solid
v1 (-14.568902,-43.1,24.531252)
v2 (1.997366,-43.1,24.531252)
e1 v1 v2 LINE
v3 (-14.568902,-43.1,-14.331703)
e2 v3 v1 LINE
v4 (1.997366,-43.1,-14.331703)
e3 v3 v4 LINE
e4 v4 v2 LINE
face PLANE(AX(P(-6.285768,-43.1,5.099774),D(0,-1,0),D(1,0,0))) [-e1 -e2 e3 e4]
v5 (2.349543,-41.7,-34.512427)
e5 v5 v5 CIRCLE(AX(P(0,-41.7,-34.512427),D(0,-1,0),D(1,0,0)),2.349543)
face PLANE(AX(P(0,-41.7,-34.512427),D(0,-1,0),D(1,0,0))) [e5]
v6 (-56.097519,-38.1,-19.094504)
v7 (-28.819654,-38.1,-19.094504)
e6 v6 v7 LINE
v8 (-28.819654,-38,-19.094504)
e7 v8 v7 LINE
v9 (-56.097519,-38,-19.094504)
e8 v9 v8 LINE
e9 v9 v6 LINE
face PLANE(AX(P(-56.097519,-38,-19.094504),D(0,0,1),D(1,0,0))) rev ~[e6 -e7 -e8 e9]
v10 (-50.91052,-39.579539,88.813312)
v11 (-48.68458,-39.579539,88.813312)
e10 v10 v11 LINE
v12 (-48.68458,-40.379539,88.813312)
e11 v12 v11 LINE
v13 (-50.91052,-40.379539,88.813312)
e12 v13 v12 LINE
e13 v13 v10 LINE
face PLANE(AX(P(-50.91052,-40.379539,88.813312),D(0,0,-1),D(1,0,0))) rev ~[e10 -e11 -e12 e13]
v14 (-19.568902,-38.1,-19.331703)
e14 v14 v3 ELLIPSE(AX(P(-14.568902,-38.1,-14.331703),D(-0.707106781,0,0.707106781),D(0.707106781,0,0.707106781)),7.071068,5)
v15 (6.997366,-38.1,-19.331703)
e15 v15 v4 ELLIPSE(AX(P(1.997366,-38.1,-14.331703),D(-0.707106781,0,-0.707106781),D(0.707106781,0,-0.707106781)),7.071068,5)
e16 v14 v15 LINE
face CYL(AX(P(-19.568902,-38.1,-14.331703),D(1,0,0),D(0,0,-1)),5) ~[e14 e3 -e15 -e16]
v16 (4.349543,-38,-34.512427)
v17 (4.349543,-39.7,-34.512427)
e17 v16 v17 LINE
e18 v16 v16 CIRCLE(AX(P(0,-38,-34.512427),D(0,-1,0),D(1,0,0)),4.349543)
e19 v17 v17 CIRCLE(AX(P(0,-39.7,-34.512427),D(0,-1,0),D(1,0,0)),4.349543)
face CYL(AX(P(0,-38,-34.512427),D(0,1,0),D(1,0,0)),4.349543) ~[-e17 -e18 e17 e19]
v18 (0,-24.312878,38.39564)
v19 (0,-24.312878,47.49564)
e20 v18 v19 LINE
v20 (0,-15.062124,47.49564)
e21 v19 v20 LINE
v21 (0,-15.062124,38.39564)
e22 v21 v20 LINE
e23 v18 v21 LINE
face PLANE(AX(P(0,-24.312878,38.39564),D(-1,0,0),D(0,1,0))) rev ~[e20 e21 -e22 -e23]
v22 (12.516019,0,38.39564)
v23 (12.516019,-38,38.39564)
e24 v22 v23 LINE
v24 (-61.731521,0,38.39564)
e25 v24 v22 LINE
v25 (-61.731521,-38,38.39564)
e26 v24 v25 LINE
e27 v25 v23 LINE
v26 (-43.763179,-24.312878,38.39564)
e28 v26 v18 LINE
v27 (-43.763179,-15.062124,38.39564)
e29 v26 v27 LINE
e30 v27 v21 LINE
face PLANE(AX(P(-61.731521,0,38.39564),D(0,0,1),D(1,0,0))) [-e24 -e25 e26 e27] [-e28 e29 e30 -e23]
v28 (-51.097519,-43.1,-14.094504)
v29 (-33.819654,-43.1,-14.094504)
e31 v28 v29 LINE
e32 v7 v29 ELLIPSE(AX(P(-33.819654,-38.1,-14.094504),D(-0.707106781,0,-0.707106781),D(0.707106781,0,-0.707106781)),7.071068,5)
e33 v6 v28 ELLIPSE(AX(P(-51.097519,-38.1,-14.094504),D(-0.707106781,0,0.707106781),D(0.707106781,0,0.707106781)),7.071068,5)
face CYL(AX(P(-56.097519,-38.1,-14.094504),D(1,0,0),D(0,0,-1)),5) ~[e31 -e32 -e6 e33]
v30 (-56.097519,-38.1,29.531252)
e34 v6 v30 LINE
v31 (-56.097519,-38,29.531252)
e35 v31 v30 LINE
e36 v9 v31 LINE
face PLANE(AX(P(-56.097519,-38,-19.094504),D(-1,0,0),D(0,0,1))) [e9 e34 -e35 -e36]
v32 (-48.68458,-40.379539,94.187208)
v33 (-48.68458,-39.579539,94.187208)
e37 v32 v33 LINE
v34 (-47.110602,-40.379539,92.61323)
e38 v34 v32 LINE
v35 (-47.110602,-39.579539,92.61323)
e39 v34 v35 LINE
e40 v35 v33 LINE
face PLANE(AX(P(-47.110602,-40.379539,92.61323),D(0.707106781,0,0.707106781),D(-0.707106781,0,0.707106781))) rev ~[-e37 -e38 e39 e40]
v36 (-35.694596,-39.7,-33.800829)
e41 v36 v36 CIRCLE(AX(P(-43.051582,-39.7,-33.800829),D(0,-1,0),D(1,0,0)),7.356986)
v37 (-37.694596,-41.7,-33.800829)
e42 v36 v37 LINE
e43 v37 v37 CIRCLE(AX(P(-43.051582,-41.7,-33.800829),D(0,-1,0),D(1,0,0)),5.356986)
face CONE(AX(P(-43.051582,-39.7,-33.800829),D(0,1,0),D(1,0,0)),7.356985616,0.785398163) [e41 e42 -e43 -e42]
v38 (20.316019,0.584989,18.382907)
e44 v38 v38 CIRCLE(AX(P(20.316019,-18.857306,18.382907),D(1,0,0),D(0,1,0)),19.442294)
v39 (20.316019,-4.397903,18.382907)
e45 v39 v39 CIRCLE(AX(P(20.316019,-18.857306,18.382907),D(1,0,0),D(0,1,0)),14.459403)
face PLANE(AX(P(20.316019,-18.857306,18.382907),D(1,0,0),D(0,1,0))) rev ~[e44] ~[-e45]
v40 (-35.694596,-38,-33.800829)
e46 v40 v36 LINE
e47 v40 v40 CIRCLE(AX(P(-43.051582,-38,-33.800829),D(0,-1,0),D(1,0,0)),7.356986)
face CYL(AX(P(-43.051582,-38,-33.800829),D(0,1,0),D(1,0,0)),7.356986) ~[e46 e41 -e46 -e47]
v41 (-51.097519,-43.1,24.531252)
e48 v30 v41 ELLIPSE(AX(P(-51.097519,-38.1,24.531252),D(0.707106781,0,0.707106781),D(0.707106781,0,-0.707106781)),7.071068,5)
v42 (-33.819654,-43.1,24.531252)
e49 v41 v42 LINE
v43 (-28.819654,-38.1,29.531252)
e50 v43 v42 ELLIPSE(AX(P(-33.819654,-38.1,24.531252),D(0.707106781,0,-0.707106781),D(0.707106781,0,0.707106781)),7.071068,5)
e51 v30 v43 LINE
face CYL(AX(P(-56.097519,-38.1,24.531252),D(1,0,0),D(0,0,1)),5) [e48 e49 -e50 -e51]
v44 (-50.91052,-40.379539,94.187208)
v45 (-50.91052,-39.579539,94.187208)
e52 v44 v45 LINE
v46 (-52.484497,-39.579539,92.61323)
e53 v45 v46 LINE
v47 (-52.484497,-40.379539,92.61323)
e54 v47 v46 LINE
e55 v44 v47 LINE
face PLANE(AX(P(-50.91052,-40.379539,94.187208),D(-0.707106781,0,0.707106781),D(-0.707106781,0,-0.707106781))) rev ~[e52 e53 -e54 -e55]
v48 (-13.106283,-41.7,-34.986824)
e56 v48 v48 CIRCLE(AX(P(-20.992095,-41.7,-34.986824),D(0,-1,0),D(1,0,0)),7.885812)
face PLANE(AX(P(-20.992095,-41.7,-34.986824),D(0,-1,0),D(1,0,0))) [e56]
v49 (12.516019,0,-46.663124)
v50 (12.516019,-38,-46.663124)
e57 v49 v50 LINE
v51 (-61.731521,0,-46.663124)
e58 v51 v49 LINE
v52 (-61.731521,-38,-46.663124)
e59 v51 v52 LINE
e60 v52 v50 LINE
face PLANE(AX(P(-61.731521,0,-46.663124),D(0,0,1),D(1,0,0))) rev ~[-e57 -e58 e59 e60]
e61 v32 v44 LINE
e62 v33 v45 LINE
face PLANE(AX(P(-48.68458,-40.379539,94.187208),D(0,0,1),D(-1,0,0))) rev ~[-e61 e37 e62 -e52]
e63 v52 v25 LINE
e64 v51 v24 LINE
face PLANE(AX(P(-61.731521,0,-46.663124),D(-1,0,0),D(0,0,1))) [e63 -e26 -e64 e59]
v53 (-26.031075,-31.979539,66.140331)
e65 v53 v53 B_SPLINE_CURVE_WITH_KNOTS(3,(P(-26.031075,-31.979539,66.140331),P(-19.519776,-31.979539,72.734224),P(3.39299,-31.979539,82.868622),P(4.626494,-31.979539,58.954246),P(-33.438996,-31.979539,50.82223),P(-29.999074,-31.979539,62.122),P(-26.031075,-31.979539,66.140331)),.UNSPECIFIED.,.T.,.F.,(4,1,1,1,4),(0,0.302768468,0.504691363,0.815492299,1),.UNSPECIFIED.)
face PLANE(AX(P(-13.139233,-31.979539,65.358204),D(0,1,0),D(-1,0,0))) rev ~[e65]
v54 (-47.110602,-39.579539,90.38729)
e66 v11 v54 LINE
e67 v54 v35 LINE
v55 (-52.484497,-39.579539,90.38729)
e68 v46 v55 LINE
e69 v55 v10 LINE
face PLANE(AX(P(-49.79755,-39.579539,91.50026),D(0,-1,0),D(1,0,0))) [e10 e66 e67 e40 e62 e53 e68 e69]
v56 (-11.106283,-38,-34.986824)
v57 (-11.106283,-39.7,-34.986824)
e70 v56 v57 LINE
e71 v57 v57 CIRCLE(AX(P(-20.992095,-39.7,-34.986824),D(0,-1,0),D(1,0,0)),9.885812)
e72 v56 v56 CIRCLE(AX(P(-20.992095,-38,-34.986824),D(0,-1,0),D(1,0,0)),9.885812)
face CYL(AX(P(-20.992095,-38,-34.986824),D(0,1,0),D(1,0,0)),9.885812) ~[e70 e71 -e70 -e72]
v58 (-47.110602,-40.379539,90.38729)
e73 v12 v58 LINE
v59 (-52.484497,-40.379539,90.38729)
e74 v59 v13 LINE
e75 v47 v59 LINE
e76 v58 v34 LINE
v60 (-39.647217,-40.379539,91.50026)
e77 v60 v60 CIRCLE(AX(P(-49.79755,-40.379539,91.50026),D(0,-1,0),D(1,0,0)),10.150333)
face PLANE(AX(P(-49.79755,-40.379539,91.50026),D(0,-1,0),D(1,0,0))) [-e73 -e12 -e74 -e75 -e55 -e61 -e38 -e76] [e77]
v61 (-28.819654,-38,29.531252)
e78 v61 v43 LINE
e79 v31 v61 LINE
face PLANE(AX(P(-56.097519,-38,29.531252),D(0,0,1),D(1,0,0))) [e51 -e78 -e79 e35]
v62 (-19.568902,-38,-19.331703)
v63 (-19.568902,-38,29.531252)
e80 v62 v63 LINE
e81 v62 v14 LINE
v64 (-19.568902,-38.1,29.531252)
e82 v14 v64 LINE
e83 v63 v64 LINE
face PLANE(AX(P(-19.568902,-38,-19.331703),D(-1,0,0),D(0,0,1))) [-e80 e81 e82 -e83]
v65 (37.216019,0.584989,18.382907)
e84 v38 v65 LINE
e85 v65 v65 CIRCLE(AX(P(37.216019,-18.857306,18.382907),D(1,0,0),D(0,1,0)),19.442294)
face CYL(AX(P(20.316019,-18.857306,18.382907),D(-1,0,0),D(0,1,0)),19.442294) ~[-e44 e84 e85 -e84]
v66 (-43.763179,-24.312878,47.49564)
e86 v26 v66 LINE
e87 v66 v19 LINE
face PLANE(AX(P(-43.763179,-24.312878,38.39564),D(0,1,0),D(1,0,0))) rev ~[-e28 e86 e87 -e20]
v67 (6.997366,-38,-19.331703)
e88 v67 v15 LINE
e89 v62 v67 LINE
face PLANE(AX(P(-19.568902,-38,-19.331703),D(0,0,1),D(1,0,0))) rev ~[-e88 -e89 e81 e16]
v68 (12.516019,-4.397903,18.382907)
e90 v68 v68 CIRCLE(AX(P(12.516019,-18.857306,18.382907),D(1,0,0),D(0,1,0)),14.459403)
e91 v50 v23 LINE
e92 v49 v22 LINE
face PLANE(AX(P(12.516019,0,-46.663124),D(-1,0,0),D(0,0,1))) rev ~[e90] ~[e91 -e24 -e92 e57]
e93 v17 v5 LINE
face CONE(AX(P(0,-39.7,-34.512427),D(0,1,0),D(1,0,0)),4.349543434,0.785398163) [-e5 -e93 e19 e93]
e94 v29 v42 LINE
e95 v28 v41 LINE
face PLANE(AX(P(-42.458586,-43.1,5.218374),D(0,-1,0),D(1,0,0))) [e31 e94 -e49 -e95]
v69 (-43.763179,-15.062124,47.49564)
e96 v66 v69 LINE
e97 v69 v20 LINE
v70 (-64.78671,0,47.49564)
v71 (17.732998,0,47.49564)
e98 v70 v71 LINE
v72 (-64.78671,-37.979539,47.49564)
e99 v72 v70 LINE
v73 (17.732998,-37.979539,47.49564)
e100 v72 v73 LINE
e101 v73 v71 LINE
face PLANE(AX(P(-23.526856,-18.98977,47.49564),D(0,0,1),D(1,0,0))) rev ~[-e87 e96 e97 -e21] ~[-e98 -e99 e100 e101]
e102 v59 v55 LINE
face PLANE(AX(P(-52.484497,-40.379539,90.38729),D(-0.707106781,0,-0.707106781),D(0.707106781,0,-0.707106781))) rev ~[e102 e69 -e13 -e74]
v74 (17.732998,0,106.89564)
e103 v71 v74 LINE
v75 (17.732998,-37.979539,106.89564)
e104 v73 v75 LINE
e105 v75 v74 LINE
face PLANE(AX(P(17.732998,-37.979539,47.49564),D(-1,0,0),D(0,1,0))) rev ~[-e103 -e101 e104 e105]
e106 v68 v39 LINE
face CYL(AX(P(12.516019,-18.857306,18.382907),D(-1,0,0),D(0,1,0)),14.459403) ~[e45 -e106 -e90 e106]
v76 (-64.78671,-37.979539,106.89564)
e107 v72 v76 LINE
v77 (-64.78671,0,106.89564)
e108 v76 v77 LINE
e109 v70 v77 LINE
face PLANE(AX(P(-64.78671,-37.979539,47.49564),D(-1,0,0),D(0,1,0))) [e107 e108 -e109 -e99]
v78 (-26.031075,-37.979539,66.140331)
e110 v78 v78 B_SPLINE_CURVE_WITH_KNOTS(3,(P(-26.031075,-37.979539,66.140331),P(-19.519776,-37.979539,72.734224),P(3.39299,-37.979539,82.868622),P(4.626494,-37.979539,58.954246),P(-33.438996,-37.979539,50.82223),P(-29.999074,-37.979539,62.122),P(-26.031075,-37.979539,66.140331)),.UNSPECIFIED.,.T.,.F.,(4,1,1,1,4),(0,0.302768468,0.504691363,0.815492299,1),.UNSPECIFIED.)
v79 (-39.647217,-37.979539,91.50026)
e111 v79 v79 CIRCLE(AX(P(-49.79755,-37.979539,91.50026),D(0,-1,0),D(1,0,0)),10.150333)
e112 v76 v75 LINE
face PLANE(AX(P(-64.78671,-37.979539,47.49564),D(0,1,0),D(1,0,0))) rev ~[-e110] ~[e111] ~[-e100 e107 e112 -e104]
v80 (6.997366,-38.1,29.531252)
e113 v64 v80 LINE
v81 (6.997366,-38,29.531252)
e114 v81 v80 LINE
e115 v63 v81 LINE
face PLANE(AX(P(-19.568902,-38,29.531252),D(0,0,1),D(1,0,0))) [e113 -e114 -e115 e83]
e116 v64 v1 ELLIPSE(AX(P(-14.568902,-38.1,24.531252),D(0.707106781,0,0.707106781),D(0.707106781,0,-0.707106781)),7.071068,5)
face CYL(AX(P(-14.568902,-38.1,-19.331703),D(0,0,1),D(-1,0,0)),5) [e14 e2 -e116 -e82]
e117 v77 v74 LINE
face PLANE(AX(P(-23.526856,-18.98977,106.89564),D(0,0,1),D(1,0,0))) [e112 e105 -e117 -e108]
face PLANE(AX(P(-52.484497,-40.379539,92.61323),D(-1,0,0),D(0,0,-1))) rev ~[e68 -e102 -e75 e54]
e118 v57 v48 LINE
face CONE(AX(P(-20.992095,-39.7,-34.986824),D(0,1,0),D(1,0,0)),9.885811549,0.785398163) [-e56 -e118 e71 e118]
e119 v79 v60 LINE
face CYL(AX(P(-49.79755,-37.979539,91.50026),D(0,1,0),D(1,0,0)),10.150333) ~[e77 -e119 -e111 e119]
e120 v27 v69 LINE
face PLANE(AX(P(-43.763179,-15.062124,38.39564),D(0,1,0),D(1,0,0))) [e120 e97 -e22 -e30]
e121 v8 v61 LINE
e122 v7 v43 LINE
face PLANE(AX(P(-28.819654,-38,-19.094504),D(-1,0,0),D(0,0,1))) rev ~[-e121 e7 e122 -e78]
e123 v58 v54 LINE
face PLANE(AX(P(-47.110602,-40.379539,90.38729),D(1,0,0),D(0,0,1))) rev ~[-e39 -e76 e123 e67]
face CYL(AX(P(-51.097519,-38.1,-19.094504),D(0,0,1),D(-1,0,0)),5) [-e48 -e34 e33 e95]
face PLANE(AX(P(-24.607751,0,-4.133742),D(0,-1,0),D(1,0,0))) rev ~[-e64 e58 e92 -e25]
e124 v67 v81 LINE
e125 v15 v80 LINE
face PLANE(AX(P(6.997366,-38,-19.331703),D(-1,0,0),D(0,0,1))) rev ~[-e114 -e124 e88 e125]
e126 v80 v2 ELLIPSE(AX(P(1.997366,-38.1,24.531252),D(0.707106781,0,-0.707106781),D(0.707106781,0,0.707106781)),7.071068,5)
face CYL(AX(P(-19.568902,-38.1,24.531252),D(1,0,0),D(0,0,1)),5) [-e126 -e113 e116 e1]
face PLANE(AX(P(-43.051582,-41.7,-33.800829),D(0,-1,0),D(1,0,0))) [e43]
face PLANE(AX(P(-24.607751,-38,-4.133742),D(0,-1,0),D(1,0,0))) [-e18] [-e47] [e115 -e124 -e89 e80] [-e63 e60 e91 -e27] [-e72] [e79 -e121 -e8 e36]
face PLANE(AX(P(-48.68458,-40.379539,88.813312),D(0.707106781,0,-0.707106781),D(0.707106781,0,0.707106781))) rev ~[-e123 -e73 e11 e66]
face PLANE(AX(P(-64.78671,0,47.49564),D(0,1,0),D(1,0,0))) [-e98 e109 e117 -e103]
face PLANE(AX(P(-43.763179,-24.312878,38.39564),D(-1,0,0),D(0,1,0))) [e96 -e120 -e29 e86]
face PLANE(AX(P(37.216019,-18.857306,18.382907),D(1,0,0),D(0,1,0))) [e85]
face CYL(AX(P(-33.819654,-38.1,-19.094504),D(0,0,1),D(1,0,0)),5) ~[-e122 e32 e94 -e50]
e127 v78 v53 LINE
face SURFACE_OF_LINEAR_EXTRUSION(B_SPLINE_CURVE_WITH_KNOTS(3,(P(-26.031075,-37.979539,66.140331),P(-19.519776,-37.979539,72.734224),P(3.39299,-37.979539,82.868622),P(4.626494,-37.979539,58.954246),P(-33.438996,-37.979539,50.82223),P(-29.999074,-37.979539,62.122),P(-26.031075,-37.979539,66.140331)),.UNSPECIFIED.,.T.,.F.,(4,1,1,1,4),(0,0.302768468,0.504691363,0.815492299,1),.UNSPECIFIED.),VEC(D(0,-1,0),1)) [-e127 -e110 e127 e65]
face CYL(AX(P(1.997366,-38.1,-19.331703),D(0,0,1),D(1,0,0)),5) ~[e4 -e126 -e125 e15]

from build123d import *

# Parameters (mm, degrees)
F0_W      = 74.2475399747
F0_H      = 85.0587636232
F1_DEPTH  = 38
F2_W      = 27.2778645158
F2_H      = 48.6257560551
F2_W_2    = 26.5662674792
F2_H_2    = 48.8629546016
F3_DEPTH  = 5.1
F4_R      = 5
F5_R      = 7.356985616
F5_R_2    = 9.8858115492
F5_R_3    = 4.3495434343
F6_DEPTH  = 3.7
F7_SIZE   = 2
F8_R      = 14.4594029366
F9_DEPTH  = 7.8
F10_R     = 19.4422944141
F11_DEPTH = 16.9
F12_W     = 43.763179332
F12_H     = 9.2507535592
F13_DEPTH = 9.1
F14_W     = 82.5197082013
F14_H     = 37.9795394838
F15_DEPTH = 59.4
F17_DEPTH = 6
F18_R     = 10.1503328775
F19_DEPTH = 2.4
F21_DEPTH = 0.8


with BuildPart() as f1:
    # F0 (on Front) → F1 (new body)
    with BuildSketch(Plane.XZ):
        with Locations((-24.6077510528, -4.1337423027)):
            Rectangle(F0_W, F0_H)
    extrude(amount=F1_DEPTH)

    # F2 (on face) → F3 (join)
    with BuildSketch(Plane.XZ.offset(38)):
        with Locations((-42.4585863948, 5.2183736116)):
            Rectangle(F2_W, F2_H)
        with Locations((-6.2857677694, 5.0997743383)):
            Rectangle(F2_W_2, F2_H_2)
    extrude(amount=F3_DEPTH)

    # F4
    f4_edges = [f1.edges().sort_by_distance(p)[0] for p in [
        (-42.458586, -43.1, 29.531252),
        (-6.285768, -43.1, 29.531252),
        (-6.285768, -43.1, -19.331703),
        (-42.458586, -43.1, -19.094504),
        (-19.568902, -43.1, 5.099774),
        (-28.819654, -43.1, 5.218374),
        (-56.097519, -43.1, 5.218374),
        (6.997366, -43.1, 5.099774),
    ]]
    fillet(f4_edges, radius=F4_R)

    # F5 (on face) → F6 (join)
    with BuildSketch(Plane.XZ.offset(38)):
        with Locations((-43.0515818298, -33.8008292019)):
            Circle(F5_R)
        with Locations((-20.9920946509, -34.9868237972)):
            Circle(F5_R_2)
        with Locations((0, -34.5124267042)):
            Circle(F5_R_3)
    extrude(amount=F6_DEPTH)

    # F7
    f7_edges = [f1.edges().sort_by_distance(p)[0] for p in [
        (-50.408567, -41.7, -33.800829),
        (-30.877906, -41.7, -34.986824),
        (-4.349543, -41.7, -34.512427),
    ]]
    chamfer(f7_edges, length=F7_SIZE)

    # F8 (on face) → F9 (join)
    with BuildSketch(Plane.YZ.offset(12.5160189345)):
        with Locations((-18.8573058695, 18.3829069138)):
            Circle(F8_R)
    extrude(amount=F9_DEPTH)

    # F10 (on face) → F11 (join)
    with BuildSketch(Plane.YZ.offset(20.3160189345)):
        with Locations((-18.8573058695, 18.3829069138)):
            Circle(F10_R)
    extrude(amount=F11_DEPTH)

    # F12 (on face) → F13 (join)
    with BuildSketch(Plane.XY.offset(38.395639509)):
        with Locations((-21.881589666, -19.687501248)):
            Rectangle(F12_W, F12_H)
    extrude(amount=F13_DEPTH)

    # F14 (on face) → F15 (join)
    with BuildSketch(Plane.XY.offset(47.495639509)):
        with Locations((-23.5268557444, -18.9897697419)):
            Rectangle(F14_W, F14_H)
    extrude(amount=F15_DEPTH)

    # F16 (on face) → F17 (cut)
    with BuildSketch(Plane.XZ.offset(37.9795394838)):
        with BuildLine():
            add(Edge.make_bspline(
                [(-26.0310750455, 66.1403313279), (-19.5197759633, 72.7342236821), (3.3929896724, 82.8686218481), (4.6264940271, 58.9542461456), (-33.4389955915, 50.822229714), (-29.9990735288, 62.122000342), (-26.0310750455, 66.1403313279)],
                knots=[0, 0, 0, 0, 0.3027684682, 0.5046913629, 0.8154922992, 1, 1, 1, 1], degree=3))
        make_face()
    extrude(amount=-F17_DEPTH, mode=Mode.SUBTRACT)

    # F18 (on face) → F19 (join)
    with BuildSketch(Plane.XZ.offset(37.9795394838)):
        with Locations((-49.7975498438, 91.5002599359)):
            Circle(F18_R)
    extrude(amount=F19_DEPTH)

    # F20 (on face) → F21 (cut)
    with BuildSketch(Plane.XZ.offset(40.3795394838)):
        Polygon((-50.9105199745, 88.8133123517), (-48.684579713, 88.8133123517), (-47.1106022596, 90.3872898051), (-47.1106022596, 92.6132300666), (-48.684579713, 94.18720752), (-50.9105199745, 94.18720752), (-52.4844974279, 92.6132300666), (-52.4844974279, 90.3872898051), align=None)
    extrude(amount=-F21_DEPTH, mode=Mode.SUBTRACT)


solid = f1.part
